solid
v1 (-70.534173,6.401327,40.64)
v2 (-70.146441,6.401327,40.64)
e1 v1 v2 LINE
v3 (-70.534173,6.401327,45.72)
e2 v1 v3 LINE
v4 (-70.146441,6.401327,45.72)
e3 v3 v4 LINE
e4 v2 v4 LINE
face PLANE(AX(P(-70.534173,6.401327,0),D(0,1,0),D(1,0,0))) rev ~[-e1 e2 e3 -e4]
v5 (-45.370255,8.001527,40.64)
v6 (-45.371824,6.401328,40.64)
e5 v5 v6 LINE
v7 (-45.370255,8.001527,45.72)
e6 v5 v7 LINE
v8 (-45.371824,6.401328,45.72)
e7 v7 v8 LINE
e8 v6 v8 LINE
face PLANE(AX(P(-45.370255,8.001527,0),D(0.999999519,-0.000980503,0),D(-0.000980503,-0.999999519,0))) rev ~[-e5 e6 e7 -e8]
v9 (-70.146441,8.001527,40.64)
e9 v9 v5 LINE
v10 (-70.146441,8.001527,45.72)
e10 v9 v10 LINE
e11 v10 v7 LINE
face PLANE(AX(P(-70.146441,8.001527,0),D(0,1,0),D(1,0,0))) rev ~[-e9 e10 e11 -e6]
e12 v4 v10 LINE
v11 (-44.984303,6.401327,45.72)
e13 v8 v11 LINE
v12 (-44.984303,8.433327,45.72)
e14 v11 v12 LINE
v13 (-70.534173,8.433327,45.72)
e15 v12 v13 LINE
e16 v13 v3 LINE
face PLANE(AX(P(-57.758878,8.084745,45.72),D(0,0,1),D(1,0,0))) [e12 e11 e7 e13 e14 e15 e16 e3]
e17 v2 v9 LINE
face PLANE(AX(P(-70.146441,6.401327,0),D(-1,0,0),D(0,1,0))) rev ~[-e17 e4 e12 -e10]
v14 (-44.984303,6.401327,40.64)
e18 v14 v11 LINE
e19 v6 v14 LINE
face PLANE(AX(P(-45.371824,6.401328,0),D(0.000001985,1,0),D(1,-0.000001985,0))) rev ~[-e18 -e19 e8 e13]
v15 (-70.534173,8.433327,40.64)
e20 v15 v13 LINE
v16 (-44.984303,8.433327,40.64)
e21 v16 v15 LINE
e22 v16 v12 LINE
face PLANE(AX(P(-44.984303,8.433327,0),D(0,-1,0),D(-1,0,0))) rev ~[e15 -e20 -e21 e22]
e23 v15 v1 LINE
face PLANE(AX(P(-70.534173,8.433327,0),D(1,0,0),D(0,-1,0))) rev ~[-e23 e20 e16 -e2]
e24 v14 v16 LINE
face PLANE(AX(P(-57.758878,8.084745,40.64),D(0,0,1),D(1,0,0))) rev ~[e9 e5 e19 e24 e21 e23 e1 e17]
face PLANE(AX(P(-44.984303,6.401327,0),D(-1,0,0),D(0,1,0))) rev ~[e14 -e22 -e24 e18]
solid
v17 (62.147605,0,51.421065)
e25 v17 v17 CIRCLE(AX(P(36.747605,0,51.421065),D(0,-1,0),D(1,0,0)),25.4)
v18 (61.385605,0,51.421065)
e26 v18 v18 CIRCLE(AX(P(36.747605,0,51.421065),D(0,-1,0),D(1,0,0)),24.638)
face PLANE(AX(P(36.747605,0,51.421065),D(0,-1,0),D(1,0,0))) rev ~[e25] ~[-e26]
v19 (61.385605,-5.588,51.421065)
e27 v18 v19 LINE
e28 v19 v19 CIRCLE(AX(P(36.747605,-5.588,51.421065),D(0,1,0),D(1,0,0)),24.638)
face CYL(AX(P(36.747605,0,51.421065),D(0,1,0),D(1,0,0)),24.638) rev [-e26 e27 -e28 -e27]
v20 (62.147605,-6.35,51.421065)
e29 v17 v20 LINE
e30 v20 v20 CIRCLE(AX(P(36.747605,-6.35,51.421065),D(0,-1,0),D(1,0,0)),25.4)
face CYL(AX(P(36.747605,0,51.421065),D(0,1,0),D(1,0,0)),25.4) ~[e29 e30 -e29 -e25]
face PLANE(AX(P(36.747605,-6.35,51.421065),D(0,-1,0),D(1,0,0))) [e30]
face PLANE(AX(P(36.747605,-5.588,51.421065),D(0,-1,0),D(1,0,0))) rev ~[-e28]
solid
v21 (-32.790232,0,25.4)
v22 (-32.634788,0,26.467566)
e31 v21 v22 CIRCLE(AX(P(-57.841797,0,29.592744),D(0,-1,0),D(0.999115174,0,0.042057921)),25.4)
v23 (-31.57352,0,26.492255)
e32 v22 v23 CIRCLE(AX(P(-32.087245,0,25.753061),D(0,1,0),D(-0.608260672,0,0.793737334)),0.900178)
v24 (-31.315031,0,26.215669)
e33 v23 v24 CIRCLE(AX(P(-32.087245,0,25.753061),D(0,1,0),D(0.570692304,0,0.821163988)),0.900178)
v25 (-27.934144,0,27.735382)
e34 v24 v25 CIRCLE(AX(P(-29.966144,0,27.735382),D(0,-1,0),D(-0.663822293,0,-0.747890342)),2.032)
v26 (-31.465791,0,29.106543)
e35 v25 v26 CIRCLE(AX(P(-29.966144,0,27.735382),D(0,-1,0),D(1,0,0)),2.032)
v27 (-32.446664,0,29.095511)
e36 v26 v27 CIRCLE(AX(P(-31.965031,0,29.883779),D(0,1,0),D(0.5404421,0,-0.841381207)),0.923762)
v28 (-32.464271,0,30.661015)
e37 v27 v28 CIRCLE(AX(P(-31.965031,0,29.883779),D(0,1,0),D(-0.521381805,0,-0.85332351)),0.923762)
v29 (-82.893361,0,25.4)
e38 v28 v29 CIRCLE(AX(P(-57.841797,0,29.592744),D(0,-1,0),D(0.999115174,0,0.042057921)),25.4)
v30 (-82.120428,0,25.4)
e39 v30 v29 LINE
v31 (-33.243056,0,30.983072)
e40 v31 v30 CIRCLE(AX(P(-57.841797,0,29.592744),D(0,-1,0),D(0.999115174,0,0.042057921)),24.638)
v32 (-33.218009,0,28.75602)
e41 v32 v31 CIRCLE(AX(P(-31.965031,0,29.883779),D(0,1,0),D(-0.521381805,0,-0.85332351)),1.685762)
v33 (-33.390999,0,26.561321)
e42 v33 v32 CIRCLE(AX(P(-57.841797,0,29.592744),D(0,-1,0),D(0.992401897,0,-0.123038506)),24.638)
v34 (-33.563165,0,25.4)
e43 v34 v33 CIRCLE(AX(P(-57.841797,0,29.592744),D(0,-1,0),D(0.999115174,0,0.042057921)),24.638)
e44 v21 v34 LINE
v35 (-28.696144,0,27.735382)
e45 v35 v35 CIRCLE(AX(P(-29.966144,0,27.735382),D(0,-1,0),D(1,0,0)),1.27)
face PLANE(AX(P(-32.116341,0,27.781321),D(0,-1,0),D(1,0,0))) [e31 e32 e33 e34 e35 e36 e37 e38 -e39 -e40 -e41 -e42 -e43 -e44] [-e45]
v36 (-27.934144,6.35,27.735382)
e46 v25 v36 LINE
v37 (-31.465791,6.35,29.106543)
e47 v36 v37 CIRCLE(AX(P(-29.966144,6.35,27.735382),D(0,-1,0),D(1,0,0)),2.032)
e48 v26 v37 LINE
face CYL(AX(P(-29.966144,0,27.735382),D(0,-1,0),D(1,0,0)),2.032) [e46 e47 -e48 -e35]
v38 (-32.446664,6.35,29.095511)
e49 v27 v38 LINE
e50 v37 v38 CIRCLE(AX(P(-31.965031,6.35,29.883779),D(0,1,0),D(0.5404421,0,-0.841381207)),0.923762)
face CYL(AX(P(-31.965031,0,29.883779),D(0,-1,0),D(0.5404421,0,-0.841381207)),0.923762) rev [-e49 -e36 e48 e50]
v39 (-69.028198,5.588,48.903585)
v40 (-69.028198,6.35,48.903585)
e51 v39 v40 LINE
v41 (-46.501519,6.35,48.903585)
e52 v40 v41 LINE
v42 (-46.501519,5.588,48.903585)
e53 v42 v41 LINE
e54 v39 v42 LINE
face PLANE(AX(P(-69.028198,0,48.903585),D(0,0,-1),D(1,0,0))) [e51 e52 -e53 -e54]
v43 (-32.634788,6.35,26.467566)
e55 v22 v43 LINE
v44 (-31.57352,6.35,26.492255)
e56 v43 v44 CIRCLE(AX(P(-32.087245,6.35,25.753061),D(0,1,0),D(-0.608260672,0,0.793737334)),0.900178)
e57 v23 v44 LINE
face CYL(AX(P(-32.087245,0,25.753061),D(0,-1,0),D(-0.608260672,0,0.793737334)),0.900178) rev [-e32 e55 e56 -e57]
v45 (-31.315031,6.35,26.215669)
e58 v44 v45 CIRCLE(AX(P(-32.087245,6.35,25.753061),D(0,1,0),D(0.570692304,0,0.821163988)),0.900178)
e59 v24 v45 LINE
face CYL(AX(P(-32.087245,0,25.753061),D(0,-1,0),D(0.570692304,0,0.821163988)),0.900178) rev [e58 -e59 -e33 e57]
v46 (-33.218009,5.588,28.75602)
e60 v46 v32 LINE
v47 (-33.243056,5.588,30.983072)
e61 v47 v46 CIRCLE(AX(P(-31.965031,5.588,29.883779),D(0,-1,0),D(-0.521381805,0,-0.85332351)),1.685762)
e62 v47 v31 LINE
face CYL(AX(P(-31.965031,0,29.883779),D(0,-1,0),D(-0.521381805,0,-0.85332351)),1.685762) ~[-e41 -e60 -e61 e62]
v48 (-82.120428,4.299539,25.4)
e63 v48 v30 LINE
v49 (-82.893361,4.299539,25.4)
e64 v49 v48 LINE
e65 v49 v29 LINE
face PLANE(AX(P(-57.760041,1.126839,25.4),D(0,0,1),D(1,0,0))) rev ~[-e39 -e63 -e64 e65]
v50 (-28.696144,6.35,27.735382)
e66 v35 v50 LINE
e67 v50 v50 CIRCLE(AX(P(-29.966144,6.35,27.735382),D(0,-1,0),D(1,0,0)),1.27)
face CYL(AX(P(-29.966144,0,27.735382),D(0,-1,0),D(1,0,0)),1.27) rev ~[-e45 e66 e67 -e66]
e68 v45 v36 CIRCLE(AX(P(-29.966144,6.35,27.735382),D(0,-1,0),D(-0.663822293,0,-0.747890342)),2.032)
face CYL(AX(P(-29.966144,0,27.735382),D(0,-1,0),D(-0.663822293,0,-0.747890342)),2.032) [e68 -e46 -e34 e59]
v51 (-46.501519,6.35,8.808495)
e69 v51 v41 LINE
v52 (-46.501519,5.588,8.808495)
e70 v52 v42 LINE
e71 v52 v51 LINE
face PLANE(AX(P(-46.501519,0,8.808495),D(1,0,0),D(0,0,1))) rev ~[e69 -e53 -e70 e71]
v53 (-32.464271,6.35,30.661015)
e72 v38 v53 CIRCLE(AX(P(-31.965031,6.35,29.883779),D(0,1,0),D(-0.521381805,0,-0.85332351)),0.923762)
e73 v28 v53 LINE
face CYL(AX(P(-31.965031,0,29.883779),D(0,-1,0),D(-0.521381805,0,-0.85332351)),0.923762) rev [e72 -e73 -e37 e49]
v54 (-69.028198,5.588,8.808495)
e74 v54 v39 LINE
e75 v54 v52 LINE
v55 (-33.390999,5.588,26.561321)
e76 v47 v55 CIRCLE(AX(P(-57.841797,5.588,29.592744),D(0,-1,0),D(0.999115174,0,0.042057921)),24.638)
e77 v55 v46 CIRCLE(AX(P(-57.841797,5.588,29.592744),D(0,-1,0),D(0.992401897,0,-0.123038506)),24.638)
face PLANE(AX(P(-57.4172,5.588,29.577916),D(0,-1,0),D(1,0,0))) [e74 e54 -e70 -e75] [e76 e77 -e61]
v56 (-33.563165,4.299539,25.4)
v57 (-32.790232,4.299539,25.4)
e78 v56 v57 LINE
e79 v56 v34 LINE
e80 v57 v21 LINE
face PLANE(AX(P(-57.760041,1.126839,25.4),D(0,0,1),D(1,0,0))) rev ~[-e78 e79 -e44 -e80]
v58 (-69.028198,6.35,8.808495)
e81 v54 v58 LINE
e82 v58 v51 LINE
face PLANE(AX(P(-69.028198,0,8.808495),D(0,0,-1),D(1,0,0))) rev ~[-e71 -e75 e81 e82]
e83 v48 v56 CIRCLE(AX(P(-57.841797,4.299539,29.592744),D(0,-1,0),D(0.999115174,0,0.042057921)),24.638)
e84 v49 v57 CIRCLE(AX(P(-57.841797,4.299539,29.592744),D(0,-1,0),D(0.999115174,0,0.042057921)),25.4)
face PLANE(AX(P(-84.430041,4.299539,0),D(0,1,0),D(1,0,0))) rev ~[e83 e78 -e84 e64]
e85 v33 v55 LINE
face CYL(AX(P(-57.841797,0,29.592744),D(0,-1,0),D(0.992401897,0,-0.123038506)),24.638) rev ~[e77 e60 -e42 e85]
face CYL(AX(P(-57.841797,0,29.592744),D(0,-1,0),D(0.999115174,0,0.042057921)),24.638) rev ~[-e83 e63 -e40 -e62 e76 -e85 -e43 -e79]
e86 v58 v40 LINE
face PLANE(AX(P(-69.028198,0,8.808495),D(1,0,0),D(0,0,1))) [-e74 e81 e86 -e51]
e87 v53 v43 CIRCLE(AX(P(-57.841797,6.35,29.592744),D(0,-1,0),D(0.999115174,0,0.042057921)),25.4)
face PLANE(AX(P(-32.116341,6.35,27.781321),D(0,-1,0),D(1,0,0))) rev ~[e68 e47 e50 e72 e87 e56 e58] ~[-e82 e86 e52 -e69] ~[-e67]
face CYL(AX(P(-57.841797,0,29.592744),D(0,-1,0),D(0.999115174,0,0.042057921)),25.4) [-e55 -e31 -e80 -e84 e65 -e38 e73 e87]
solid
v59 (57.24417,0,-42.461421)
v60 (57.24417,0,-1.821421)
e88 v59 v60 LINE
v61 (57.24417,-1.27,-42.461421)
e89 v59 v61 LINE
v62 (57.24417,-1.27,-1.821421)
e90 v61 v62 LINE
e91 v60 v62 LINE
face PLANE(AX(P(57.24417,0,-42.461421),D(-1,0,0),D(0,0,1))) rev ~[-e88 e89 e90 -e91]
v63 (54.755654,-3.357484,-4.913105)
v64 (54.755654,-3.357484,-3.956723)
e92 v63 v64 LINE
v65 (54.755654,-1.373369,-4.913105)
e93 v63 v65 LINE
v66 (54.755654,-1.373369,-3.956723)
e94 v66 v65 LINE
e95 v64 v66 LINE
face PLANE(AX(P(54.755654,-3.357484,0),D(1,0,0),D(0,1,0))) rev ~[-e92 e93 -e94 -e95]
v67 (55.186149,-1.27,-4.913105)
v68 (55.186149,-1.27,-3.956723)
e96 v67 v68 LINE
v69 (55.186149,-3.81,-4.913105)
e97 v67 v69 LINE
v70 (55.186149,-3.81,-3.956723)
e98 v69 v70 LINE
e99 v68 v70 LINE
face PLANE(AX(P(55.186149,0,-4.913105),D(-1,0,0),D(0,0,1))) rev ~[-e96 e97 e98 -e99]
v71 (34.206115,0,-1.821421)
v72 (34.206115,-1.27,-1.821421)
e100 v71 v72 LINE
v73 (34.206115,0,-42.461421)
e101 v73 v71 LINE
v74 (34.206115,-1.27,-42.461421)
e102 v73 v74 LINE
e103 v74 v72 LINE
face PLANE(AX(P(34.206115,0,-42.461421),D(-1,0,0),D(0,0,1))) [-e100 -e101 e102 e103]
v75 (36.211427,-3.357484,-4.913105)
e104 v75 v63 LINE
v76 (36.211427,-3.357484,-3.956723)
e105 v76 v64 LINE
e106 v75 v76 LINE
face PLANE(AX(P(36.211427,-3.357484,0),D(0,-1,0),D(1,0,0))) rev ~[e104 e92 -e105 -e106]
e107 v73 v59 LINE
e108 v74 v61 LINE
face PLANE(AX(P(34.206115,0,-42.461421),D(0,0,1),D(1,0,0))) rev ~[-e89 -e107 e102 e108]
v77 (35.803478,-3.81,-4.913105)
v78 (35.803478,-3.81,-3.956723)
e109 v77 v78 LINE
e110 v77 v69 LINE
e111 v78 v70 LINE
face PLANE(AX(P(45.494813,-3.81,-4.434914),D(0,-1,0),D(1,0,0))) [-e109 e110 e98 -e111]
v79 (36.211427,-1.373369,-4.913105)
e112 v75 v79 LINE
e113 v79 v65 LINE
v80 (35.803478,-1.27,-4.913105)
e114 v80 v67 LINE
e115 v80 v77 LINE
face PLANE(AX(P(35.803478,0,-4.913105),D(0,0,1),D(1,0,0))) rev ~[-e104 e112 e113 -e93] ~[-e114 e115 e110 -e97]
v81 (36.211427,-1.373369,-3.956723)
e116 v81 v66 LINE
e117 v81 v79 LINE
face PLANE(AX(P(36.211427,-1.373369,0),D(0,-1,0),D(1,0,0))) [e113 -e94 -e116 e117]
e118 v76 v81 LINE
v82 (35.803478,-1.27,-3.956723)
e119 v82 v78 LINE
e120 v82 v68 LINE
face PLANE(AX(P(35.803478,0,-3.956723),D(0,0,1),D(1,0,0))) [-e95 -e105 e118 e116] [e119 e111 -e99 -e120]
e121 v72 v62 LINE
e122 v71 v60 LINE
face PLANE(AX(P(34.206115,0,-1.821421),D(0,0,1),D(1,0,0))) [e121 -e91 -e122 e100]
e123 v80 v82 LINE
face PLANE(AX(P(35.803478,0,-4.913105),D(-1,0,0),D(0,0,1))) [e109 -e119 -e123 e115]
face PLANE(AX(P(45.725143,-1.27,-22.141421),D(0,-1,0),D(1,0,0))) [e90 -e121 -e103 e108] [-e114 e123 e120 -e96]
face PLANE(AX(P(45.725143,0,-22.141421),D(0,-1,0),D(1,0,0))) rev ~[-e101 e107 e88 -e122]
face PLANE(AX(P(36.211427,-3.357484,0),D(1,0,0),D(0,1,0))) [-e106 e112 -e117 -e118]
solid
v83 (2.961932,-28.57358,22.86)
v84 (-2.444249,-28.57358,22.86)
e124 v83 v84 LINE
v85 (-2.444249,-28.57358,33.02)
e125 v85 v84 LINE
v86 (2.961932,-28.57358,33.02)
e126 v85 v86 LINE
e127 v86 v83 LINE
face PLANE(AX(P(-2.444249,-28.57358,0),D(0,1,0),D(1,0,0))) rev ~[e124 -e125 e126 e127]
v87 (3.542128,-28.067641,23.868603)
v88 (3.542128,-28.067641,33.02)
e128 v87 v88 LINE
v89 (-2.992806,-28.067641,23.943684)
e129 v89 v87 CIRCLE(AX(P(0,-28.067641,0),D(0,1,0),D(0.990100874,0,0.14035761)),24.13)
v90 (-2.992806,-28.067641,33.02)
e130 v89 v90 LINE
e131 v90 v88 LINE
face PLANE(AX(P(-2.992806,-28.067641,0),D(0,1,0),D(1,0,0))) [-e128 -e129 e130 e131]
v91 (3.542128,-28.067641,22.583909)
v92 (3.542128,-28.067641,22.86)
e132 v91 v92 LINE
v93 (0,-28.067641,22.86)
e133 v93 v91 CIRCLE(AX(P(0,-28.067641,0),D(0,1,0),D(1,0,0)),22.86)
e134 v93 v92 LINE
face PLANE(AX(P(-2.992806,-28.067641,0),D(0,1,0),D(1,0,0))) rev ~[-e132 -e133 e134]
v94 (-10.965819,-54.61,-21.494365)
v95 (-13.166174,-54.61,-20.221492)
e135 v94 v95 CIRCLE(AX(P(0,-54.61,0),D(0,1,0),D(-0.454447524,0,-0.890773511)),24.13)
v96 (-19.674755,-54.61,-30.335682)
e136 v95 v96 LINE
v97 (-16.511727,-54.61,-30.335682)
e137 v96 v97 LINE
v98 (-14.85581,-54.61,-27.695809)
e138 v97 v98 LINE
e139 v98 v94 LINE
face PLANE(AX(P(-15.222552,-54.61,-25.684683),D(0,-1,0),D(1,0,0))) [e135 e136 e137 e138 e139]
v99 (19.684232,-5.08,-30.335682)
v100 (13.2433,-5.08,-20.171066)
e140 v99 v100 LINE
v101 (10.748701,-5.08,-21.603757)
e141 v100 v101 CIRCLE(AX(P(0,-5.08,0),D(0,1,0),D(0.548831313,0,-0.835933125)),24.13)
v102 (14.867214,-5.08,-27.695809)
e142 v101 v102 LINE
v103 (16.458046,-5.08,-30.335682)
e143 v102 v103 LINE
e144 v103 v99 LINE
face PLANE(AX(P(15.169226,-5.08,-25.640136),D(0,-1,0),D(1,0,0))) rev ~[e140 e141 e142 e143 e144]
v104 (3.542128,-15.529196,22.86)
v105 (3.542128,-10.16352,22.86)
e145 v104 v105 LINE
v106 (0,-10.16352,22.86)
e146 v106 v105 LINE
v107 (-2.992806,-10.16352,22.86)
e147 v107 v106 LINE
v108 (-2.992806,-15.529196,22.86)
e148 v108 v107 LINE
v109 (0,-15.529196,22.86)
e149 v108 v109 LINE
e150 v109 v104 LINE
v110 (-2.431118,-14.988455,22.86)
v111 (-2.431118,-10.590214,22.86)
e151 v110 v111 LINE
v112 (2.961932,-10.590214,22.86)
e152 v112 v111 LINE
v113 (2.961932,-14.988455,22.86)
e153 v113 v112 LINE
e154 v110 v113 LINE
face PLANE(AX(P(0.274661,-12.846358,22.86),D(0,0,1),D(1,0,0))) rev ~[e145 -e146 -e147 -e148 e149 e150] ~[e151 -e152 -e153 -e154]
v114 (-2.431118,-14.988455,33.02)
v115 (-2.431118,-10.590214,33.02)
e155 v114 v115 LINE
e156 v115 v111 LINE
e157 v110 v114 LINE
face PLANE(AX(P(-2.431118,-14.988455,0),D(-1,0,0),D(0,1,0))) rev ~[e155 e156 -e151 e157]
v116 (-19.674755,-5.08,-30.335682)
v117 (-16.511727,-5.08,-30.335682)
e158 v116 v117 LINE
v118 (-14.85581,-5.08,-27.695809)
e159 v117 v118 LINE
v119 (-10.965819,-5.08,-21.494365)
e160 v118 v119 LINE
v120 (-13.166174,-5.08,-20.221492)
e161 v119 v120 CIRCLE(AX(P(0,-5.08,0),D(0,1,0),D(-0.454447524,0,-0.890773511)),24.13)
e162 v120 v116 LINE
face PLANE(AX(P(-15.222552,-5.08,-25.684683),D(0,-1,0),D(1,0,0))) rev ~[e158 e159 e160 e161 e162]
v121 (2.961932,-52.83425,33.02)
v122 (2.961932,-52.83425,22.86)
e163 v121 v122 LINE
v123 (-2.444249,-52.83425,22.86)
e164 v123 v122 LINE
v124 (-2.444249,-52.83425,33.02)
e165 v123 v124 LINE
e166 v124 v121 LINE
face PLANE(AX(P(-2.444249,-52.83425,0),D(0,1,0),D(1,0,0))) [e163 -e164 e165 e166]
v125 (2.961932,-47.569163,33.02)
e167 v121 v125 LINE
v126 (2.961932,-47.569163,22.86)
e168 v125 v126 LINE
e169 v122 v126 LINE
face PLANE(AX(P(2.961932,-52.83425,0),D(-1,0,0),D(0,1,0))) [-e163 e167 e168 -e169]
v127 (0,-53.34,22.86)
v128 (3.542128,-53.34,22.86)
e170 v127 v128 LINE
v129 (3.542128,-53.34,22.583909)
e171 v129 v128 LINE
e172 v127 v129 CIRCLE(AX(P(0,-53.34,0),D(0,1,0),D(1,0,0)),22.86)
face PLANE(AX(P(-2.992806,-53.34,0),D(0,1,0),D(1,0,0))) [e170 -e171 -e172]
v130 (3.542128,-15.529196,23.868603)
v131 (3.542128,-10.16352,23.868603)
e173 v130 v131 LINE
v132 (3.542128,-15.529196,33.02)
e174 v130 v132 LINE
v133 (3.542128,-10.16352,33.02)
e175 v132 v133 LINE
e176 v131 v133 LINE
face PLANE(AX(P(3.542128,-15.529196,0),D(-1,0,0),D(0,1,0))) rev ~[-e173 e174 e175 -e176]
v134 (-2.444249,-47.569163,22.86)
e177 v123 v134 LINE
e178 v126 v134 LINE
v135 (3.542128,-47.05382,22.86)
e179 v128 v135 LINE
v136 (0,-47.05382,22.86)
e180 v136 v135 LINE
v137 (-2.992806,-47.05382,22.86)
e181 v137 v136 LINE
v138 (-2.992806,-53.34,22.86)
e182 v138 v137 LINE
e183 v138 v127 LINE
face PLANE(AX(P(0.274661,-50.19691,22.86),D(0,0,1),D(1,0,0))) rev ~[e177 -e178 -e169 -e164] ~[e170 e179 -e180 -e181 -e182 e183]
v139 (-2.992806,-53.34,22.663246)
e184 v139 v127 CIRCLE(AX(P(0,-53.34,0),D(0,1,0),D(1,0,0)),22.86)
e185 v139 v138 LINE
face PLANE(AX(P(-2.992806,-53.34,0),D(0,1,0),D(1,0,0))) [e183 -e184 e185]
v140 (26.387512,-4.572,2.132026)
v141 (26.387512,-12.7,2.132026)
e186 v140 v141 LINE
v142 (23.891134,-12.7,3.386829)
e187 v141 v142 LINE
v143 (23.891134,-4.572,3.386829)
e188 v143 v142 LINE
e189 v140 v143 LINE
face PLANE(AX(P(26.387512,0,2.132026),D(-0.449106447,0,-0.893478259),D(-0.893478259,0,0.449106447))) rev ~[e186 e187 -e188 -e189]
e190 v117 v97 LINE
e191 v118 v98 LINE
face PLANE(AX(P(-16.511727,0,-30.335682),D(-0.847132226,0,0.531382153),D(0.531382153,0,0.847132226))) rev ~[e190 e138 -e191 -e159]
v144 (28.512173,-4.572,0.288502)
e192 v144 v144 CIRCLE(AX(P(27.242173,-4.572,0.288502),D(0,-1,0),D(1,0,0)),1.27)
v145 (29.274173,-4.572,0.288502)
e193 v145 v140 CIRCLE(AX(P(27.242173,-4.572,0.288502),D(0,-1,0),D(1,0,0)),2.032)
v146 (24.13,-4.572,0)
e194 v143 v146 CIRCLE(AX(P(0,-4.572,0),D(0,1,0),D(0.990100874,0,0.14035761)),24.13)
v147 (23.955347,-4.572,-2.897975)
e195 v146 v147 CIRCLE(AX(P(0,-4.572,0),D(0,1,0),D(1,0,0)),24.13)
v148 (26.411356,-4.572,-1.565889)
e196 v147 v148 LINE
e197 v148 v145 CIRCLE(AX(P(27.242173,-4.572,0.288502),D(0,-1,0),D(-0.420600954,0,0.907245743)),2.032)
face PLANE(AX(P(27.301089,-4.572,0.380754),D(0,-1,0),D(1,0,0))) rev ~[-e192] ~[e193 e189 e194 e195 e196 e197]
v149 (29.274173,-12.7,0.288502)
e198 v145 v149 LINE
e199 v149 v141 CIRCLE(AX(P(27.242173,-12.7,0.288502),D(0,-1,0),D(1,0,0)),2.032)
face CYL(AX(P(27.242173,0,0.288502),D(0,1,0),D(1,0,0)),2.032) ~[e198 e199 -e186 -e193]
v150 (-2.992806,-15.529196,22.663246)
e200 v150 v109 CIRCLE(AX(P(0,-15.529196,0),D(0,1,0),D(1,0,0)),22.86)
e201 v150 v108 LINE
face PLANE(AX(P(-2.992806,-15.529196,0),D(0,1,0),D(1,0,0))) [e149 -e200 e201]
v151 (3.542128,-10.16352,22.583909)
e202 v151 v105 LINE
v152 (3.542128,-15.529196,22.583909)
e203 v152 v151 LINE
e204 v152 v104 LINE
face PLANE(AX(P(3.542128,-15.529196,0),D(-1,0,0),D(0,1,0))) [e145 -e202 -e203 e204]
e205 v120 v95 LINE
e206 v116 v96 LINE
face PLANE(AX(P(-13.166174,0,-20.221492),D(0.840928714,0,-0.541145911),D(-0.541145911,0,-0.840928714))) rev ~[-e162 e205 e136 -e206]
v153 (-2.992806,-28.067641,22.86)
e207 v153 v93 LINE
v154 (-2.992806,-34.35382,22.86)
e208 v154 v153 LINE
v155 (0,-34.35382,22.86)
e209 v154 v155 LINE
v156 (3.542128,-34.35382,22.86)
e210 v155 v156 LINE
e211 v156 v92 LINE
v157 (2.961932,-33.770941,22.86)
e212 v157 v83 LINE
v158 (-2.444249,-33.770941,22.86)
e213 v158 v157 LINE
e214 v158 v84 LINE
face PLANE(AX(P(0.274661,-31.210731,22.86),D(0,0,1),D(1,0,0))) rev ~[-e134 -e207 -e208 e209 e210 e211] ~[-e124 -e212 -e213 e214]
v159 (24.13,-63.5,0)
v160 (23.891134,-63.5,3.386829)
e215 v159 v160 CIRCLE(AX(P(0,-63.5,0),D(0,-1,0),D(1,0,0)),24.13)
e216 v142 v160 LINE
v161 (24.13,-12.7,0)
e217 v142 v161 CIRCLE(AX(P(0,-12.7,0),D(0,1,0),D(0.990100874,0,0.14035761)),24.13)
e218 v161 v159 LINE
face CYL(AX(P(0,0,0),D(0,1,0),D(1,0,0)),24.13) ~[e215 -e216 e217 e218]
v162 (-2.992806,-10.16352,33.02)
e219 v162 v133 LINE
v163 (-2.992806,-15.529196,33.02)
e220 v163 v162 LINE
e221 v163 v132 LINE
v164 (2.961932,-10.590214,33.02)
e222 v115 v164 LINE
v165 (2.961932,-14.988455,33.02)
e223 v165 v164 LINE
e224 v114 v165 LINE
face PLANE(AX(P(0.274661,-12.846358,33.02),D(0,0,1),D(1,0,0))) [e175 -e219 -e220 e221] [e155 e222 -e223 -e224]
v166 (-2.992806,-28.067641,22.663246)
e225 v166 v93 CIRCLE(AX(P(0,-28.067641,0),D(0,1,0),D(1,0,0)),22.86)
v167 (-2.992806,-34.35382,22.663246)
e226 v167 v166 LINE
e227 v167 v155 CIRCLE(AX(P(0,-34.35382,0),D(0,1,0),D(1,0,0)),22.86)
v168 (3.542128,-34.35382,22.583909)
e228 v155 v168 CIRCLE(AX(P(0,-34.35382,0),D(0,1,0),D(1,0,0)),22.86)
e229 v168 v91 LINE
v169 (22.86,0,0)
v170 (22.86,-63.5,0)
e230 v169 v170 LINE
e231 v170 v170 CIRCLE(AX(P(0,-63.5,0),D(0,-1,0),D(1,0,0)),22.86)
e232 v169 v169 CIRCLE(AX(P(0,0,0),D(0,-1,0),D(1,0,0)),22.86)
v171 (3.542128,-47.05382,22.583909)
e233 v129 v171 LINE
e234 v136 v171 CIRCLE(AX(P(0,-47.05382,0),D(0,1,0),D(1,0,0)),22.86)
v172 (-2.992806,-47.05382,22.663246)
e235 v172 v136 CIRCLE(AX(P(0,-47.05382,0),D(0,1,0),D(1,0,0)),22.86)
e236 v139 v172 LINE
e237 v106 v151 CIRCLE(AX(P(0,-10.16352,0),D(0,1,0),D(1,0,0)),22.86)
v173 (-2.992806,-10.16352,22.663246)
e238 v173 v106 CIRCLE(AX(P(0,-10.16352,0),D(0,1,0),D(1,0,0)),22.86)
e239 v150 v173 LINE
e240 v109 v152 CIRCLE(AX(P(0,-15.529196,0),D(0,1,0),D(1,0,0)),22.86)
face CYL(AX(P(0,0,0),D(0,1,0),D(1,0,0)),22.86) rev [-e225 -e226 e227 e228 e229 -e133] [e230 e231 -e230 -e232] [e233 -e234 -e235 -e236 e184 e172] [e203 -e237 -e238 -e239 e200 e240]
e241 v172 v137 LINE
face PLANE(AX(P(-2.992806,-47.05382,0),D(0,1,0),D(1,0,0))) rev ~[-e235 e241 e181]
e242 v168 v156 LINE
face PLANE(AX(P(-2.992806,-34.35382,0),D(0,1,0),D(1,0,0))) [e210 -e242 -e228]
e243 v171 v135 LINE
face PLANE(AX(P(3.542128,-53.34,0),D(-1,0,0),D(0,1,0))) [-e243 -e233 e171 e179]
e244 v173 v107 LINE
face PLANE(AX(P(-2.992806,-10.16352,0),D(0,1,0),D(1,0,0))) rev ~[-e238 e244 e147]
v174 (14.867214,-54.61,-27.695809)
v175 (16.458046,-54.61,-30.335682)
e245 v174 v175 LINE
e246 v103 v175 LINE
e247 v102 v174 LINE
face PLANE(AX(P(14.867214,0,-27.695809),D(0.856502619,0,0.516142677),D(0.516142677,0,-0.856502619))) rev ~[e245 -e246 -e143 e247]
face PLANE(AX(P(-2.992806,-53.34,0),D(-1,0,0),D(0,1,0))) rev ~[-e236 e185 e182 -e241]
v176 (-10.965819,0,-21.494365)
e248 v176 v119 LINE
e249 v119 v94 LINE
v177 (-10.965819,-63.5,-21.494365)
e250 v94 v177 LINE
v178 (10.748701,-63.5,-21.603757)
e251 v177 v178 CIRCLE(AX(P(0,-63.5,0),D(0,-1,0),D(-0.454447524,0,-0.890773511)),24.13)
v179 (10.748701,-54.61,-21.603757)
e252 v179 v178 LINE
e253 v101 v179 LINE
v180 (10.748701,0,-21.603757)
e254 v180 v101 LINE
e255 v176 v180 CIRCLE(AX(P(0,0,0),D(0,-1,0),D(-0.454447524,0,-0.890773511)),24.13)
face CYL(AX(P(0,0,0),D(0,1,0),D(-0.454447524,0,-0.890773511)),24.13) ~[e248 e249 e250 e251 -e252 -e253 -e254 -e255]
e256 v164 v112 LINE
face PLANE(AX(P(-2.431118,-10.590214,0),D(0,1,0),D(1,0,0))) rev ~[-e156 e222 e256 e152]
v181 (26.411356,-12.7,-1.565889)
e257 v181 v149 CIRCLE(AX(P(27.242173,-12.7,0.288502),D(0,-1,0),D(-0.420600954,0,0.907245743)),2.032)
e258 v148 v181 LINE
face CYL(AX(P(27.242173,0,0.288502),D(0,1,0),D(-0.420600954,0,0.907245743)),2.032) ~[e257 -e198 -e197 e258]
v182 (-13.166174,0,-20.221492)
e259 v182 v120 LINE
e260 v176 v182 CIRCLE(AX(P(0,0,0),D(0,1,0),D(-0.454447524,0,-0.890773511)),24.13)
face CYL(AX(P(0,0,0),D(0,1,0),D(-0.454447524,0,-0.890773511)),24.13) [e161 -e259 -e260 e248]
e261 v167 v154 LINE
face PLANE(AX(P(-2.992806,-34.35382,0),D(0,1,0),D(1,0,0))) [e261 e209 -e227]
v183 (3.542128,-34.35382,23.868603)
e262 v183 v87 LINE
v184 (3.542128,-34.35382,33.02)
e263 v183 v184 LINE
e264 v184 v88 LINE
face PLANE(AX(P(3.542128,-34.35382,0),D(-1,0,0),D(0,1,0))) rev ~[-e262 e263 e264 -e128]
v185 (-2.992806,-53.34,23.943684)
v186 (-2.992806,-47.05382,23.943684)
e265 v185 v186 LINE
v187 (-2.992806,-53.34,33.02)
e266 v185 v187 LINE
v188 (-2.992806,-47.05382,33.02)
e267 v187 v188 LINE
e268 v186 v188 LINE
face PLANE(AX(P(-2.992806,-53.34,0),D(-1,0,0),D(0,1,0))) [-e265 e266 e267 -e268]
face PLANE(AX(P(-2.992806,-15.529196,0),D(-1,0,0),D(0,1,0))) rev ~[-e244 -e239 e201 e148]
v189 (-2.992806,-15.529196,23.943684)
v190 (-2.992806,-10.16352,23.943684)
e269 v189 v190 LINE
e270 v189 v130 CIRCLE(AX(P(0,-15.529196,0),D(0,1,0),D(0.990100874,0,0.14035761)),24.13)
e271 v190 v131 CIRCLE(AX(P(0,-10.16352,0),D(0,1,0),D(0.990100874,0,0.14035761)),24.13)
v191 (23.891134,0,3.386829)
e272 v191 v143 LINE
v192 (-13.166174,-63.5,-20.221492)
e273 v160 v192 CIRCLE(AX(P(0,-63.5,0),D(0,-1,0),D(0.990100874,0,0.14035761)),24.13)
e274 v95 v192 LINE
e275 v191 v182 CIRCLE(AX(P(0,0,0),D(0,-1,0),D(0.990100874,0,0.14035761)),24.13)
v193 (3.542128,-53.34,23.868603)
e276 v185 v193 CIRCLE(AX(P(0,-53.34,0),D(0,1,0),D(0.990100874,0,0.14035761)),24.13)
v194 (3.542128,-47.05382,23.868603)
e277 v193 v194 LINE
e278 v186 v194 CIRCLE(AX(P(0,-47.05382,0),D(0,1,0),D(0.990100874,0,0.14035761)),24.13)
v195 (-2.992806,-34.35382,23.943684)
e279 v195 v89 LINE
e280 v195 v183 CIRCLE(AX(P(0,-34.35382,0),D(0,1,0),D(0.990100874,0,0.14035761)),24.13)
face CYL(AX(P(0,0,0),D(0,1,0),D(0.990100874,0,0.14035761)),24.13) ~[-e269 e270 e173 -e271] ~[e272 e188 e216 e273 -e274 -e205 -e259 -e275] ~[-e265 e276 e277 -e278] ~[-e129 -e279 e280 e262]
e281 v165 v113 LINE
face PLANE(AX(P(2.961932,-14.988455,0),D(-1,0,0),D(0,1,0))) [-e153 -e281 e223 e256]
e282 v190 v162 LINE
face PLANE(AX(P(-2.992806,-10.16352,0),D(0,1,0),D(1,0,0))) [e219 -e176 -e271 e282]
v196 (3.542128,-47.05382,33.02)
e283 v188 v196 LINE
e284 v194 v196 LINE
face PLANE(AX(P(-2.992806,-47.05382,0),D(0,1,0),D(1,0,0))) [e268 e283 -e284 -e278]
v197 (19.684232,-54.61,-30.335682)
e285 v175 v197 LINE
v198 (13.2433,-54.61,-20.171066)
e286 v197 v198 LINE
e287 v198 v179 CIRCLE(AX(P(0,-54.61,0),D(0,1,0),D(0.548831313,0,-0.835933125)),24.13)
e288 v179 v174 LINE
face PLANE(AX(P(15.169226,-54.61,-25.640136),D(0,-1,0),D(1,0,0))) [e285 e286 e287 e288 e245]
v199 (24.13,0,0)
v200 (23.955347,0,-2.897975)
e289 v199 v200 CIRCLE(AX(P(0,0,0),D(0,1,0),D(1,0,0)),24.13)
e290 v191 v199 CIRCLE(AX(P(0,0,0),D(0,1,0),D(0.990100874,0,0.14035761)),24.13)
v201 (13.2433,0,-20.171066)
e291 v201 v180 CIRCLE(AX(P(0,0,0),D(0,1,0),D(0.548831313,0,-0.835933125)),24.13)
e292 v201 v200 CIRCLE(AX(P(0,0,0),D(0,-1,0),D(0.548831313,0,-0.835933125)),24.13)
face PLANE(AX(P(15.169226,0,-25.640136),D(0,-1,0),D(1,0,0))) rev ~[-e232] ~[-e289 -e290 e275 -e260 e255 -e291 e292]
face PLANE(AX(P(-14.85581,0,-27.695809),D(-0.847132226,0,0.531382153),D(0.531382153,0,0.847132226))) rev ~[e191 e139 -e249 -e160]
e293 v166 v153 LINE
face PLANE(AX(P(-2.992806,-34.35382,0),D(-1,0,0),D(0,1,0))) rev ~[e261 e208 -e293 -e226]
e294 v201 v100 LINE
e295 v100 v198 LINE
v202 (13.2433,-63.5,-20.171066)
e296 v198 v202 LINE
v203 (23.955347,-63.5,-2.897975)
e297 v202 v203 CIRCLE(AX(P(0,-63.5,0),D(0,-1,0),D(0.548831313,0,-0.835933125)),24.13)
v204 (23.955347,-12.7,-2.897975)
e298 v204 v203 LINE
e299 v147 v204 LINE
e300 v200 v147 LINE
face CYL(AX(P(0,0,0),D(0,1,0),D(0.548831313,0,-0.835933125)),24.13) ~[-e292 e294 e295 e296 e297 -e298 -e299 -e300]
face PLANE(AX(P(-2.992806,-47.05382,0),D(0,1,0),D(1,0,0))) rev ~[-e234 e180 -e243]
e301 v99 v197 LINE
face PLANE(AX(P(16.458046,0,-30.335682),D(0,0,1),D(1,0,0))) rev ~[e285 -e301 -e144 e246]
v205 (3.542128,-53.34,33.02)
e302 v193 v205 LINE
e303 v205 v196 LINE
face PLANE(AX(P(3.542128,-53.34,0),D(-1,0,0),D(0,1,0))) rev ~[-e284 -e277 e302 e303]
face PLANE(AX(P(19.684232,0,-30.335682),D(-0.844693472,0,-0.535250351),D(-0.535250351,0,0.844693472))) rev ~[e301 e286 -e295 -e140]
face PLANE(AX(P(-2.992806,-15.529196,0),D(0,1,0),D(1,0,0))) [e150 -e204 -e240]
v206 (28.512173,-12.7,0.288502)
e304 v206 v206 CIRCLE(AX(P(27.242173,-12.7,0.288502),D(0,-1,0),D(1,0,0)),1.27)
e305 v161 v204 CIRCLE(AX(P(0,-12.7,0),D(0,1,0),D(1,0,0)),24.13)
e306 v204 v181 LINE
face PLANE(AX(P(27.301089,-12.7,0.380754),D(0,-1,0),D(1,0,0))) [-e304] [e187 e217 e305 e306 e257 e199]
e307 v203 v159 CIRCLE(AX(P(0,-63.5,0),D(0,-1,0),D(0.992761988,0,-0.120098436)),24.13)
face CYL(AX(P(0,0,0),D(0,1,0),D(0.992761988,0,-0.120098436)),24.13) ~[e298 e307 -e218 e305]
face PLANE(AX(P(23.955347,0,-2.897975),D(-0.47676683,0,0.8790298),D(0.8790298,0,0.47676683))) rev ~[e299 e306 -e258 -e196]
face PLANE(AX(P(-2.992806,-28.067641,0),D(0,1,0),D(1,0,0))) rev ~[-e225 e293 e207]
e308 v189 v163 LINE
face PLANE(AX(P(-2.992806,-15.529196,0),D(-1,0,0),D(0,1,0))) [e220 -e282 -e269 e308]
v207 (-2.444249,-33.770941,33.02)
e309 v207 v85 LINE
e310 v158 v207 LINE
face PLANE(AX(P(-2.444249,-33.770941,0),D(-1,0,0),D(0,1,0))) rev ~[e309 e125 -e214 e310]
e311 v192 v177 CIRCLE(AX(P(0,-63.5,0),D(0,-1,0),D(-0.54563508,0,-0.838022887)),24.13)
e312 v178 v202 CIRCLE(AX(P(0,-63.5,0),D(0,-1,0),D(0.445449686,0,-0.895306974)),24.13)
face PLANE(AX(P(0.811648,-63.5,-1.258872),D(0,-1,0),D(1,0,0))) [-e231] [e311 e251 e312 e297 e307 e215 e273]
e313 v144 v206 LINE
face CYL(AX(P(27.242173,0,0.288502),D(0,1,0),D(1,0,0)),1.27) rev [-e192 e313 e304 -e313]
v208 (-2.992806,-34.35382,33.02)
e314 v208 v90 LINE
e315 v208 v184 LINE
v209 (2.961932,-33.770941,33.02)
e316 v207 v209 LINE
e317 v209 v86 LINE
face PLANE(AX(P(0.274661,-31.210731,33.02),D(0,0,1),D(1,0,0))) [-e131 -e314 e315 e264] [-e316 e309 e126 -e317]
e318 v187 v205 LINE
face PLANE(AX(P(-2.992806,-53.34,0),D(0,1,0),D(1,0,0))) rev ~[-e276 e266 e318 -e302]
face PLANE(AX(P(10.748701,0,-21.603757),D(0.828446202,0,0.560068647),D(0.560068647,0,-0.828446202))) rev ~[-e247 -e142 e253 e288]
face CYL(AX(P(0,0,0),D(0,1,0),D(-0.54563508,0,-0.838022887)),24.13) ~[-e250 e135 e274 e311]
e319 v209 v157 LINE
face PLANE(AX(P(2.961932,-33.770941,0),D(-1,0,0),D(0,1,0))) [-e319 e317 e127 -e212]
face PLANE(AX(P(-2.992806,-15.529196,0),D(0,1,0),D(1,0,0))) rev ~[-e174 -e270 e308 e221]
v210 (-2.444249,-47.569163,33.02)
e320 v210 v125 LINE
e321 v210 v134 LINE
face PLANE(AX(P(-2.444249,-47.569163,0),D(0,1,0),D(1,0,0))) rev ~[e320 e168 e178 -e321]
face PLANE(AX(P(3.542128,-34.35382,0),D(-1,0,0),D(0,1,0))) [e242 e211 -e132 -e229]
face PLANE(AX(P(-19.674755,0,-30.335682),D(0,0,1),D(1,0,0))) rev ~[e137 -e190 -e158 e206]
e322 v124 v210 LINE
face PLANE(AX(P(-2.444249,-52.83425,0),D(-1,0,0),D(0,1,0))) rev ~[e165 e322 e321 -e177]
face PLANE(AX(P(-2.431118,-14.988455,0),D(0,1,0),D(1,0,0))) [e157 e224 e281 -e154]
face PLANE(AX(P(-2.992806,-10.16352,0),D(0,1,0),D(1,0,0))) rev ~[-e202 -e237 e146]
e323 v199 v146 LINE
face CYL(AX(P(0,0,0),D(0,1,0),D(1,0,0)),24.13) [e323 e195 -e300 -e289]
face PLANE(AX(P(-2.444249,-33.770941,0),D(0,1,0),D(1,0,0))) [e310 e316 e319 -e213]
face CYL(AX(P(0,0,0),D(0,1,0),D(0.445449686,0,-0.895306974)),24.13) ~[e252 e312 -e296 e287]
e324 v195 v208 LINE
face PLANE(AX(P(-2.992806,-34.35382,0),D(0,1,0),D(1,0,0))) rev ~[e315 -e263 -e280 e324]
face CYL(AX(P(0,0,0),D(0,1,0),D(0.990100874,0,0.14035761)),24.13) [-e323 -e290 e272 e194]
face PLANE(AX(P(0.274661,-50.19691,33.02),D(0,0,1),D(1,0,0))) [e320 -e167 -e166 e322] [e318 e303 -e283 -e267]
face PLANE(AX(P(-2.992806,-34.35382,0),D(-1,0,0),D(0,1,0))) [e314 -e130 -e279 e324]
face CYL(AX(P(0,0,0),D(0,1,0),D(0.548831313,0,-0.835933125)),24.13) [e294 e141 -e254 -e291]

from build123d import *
from build123d import SkipClean  # not in build123d's __all__

# Parameters (mm, degrees)
F3_DEPTH  = 6.35
F0_R      = 25.4
F4_DEPTH  = 6.35
F0_R_2    = 22.86
F5_DEPTH  = 63.5
F0_R_3    = 1.27
F6_DEPTH  = 12.7
F7_T      = -0.762
F1_W      = 53.34
F1_H      = 6.3453992899
F8_DEPTH  = 25.4
F9_DEPTH  = 6.35
F10_T     = -0.762
F2_W      = 22.526679039
F2_H      = 40.0950905681
F11_DEPTH = 12.7
F12_DEPTH = 4.572
F13_DEPTH = 45.72
F14_DEPTH = 40.64
F2_W_2    = 23.0380557477
F2_H_2    = 40.64
F2_W_3    = 19.3826705217
F2_H_3    = 0.9563816711
F15_DEPTH = 1.27
F16_W     = 6.5349340439
F16_H     = 5.3656761461
F16_W_2   = 5.3930499125
F16_H_2   = 4.3982407078
F16_H_3   = 6.2861796468
F16_W_3   = 5.4061815608
F16_H_4   = 5.1973611116
F16_H_5   = 5.2650868893
F17_DEPTH = 33.02
F18_DEPTH = 22.86
F19_DEPTH = 76.8220646396
F20_DEPTH = 3.81
F21_W     = 18.5442268848
F21_H     = 1.9841159228
F22_DEPTH = 6.35
F23_DEPTH = 54.61
F24_DEPTH = 5.08


# Not quite as in the source:
# - after a boolean that leaves OpenCascade's solid faulty, fix() repairs it
# - a feature names something its author has since deleted; it is built from what else it names


with BuildPart() as f3:
    # F0 (on Front) → F3 (new body)
    with BuildSketch(Plane.XZ):
        with BuildLine():
            ThreePointArc((-32.4466640218, 29.0955113473), (-32.8887348811, 29.8733902735), (-32.4642711977, 30.661015089))
            ThreePointArc((-32.4642711977, 30.661015089), (-83.2208236821, 30.6247252425), (-32.6347884268, 26.467565851))
            ThreePointArc((-32.6347884268, 26.467565851), (-32.5066296075, 27.7790977549), (-32.4466640218, 29.0955113473))
        make_face()
    extrude(amount=-F3_DEPTH)

    # F7
    f7_openings = [f3.faces().sort_by_distance(p)[0] for p in [
        (-57.847912, 0, 29.592675),
    ]]
    offset(amount=F7_T, openings=f7_openings)

    # F1 (on Top) → F8 (cut)
    with BuildSketch(Plane.XY):
        with Locations((-57.7600412071, 1.1268389062)):
            Rectangle(F1_W, F1_H)
    extrude(amount=F8_DEPTH, mode=Mode.SUBTRACT)

    # F0 (on Front) → F9 (join)
    with BuildSketch(Plane.XZ):
        with BuildLine():
            ThreePointArc((-31.4657914959, 29.1065431926), (-31.9546424795, 28.9600756065), (-32.4466640218, 29.0955113473))
            ThreePointArc((-32.4466640218, 29.0955113473), (-32.5066296075, 27.7790977549), (-32.6347884268, 26.467565851))
            ThreePointArc((-32.6347884268, 26.467565851), (-32.1081809699, 26.6529955741), (-31.5735203503, 26.492254734))
            ThreePointArc((-31.5735203503, 26.492254734), (-31.9964212199, 27.8190453719), (-31.4657914959, 29.1065431926))
        make_face()
        with BuildLine():
            ThreePointArc((-27.9341442708, 27.7353822975), (-29.2307053411, 29.6296245156), (-31.4657914959, 29.1065431926))
            ThreePointArc((-31.4657914959, 29.1065431926), (-31.9964212199, 27.8190453719), (-31.5735203503, 26.492254734))
            ThreePointArc((-31.5735203503, 26.492254734), (-31.4295715741, 26.3677040501), (-31.3150311705, 26.2156691233))
            ThreePointArc((-31.3150311705, 26.2156691233), (-29.133051893, 25.8820120997), (-27.9341442708, 27.7353822975))
        make_face()
        with Locations((-29.9661442708, 27.7353822975)):
            Circle(F0_R_3, mode=Mode.SUBTRACT)
    extrude(amount=-F9_DEPTH)

    # F2 (on Front) → F11 (cut)
    with BuildSketch(Plane.XZ):
        with Locations((-57.7648580501, 28.8560400026)):
            Rectangle(F2_W, F2_H)
    extrude(amount=-F11_DEPTH, mode=Mode.SUBTRACT)


with BuildPart() as f4:
    # F0 (on Front) → F4 (new body)
    with BuildSketch(Plane.XZ):
        with Locations((36.7476053159, 51.4210646396)):
            Circle(F0_R)
    extrude(amount=F4_DEPTH)

    # F10
    f10_openings = [f4.faces().sort_by_distance(p)[0] for p in [
        (36.747605, 0, 51.421065),
    ]]
    offset(amount=F10_T, openings=f10_openings)


with BuildPart() as f5:
    # F0 (on Front) → F5 (new body)
    with BuildSketch(Plane.XZ):
        with BuildLine():
            ThreePointArc((23.9553467799, -2.897975268), (24.0862971189, -1.4516167195), (24.13, 0))
            ThreePointArc((24.13, 0), (24.0702094486, 1.6976210124), (23.8911340985, 3.38682912))
            ThreePointArc((23.8911340985, 3.38682912), (-12.9651224252, 20.3509827896), (-13.1661744724, -20.2214922734))
            ThreePointArc((-13.1661744724, -20.2214922734), (-12.0827697744, -20.8869235308), (-10.9658187558, -21.49436482))
            ThreePointArc((-10.9658187558, -21.49436482), (-0.1215595159, -24.1296938083), (10.7487009216, -21.6037572773))
            ThreePointArc((10.7487009216, -21.6037572773), (12.0173696309, -20.9246201197), (13.2432995784, -20.1710663148))
            ThreePointArc((13.2432995784, -20.1710663148), (20.5066999125, -12.7173959087), (23.9553467799, -2.897975268))
        make_face()
        Circle(F0_R_2, mode=Mode.SUBTRACT)
    extrude(amount=F5_DEPTH)

    # F0 (on Front) → F6 (join)
    with BuildSketch(Plane.XZ):
        with BuildLine():
            ThreePointArc((29.2741734921, 0.2885023588), (28.3358719352, 2.0010582602), (26.3875123546, 2.1320257082))
            ThreePointArc((26.3875123546, 2.1320257082), (25.2102157311, 0.2754005508), (26.4113560417, -1.5658887446))
            ThreePointArc((26.4113560417, -1.5658887446), (28.346891316, -1.4169660607), (29.2741734921, 0.2885023588))
        make_face()
        with Locations((27.2421734921, 0.2885023588)):
            Circle(F0_R_3, mode=Mode.SUBTRACT)
        with BuildLine():
            ThreePointArc((23.8911340985, 3.38682912), (24.0702094486, 1.6976210124), (24.13, 0))
            ThreePointArc((24.13, 0), (24.0862971189, -1.4516167195), (23.9553467799, -2.897975268))
            Line((23.9553467799, -2.897975268), (26.4113560417, -1.5658887446))
            ThreePointArc((26.4113560417, -1.5658887446), (25.2102157311, 0.2754005508), (26.3875123546, 2.1320257082))
            Line((26.3875123546, 2.1320257082), (23.8911340985, 3.38682912))
        make_face()
    extrude(amount=F6_DEPTH)

    # F0 (on Front) → F12 (cut)
    with BuildSketch(Plane.XZ):
        with BuildLine():
            ThreePointArc((29.2741734921, 0.2885023588), (28.3358719352, 2.0010582602), (26.3875123546, 2.1320257082))
            ThreePointArc((26.3875123546, 2.1320257082), (25.2102157311, 0.2754005508), (26.4113560417, -1.5658887446))
            ThreePointArc((26.4113560417, -1.5658887446), (28.346891316, -1.4169660607), (29.2741734921, 0.2885023588))
        make_face()
        with Locations((27.2421734921, 0.2885023588)):
            Circle(F0_R_3, mode=Mode.SUBTRACT)
        with BuildLine():
            ThreePointArc((23.8911340985, 3.38682912), (24.0702094486, 1.6976210124), (24.13, 0))
            ThreePointArc((24.13, 0), (24.0862971189, -1.4516167195), (23.9553467799, -2.897975268))
            Line((23.9553467799, -2.897975268), (26.4113560417, -1.5658887446))
            ThreePointArc((26.4113560417, -1.5658887446), (25.2102157311, 0.2754005508), (26.3875123546, 2.1320257082))
            Line((26.3875123546, 2.1320257082), (23.8911340985, 3.38682912))
        make_face()
    with SkipClean():  # cleaning this boolean's faces spoils the solid; the shape is the same uncleaned
        extrude(amount=F12_DEPTH, mode=Mode.SUBTRACT)

    # F16 (on Top) → F17 (join)
    with BuildSketch(Plane.XY):
        with Locations((0.2746605314, -12.8463576046)):
            Rectangle(F16_W, F16_H)
        with Locations((0.2654072596, -12.7893346362)):
            Rectangle(F16_W_2, F16_H_2, mode=Mode.SUBTRACT)
        with Locations((0.2746605314, -31.2107305297)):
            Rectangle(F16_W, F16_H_3)
        with Locations((0.2588414354, -31.1722606421)):
            Rectangle(F16_W_3, F16_H_4, mode=Mode.SUBTRACT)
        with Locations((0.2746605314, -50.1969101766)):
            Rectangle(F16_W, F16_H_3)
        with Locations((0.2588414354, -50.2017065883)):
            Rectangle(F16_W_3, F16_H_5, mode=Mode.SUBTRACT)
    extrude(amount=F17_DEPTH)

    add(f5.part.fix(), mode=Mode.REPLACE)

    # F16 (on Top) → F18 (cut)
    with BuildSketch(Plane.XY):
        with Locations((0.2746605314, -31.2107305297)):
            Rectangle(F16_W, F16_H_3)
        with Locations((0.2588414354, -31.1722606421)):
            Rectangle(F16_W_3, F16_H_4, mode=Mode.SUBTRACT)
        with Locations((0.2746605314, -12.8463576046)):
            Rectangle(F16_W, F16_H)
        with Locations((0.2654072596, -12.7893346362)):
            Rectangle(F16_W_2, F16_H_2, mode=Mode.SUBTRACT)
        with Locations((0.2746605314, -50.1969101766)):
            Rectangle(F16_W, F16_H_3)
        with Locations((0.2588414354, -50.2017065883)):
            Rectangle(F16_W_3, F16_H_5, mode=Mode.SUBTRACT)
    extrude(amount=F18_DEPTH, mode=Mode.SUBTRACT)

    # F16 (on Top) → F19 (cut, through all)
    with BuildSketch(Plane.XY):
        with Locations((0.2654072596, -12.7893346362)):
            Rectangle(F16_W_2, F16_H_2)
        with Locations((0.2588414354, -31.1722606421)):
            Rectangle(F16_W_3, F16_H_4)
        with Locations((0.2588414354, -50.2017065883)):
            Rectangle(F16_W_3, F16_H_5)
    extrude(amount=F19_DEPTH, mode=Mode.SUBTRACT)

    # F0 (on Front) → F23 (join)
    with BuildSketch(Plane.XZ):
        with BuildLine():
            Line((19.6842323282, -30.335681513), (13.2432995784, -20.1710663148))
            ThreePointArc((13.2432995784, -20.1710663148), (12.0173696309, -20.9246201197), (10.7487009216, -21.6037572773))
            Line((10.7487009216, -21.6037572773), (14.867214486, -27.6958085597))
            Line((14.867214486, -27.6958085597), (16.4580456913, -30.335681513))
            Line((16.4580456913, -30.335681513), (19.6842323282, -30.335681513))
        make_face()
        with BuildLine():
            ThreePointArc((-10.9658187558, -21.49436482), (-12.0827697744, -20.8869235308), (-13.1661744724, -20.2214922734))
            Line((-13.1661744724, -20.2214922734), (-19.6747548778, -30.335681513))
            Line((-19.6747548778, -30.335681513), (-16.5117273591, -30.335681513))
            Line((-16.5117273591, -30.335681513), (-14.8558095098, -27.6958085597))
            Line((-14.8558095098, -27.6958085597), (-10.9658187558, -21.49436482))
        make_face()
    extrude(amount=F23_DEPTH)

    # F0 (on Front) → F24 (cut)
    with BuildSketch(Plane.XZ):
        with BuildLine():
            Line((19.6842323282, -30.335681513), (13.2432995784, -20.1710663148))
            ThreePointArc((13.2432995784, -20.1710663148), (12.0173696309, -20.9246201197), (10.7487009216, -21.6037572773))
            Line((10.7487009216, -21.6037572773), (14.867214486, -27.6958085597))
            Line((14.867214486, -27.6958085597), (16.4580456913, -30.335681513))
            Line((16.4580456913, -30.335681513), (19.6842323282, -30.335681513))
        make_face()
        with BuildLine():
            ThreePointArc((-10.9658187558, -21.49436482), (-12.0827697744, -20.8869235308), (-13.1661744724, -20.2214922734))
            Line((-13.1661744724, -20.2214922734), (-19.6747548778, -30.335681513))
            Line((-19.6747548778, -30.335681513), (-16.5117273591, -30.335681513))
            Line((-16.5117273591, -30.335681513), (-14.8558095098, -27.6958085597))
            Line((-14.8558095098, -27.6958085597), (-10.9658187558, -21.49436482))
        make_face()
    with SkipClean():  # cleaning this boolean's faces spoils the solid; the shape is the same uncleaned
        extrude(amount=F24_DEPTH, mode=Mode.SUBTRACT)


with BuildPart() as f13:
    # F1 (on Top) → F13 (new body)
    with BuildSketch(Plane.XY):
        Polygon((-45.3702554693, 8.4333274387), (-70.1464414597, 8.4333274387), (-70.5341733992, 8.4333274387), (-70.5341733992, 6.4013274387), (-70.1464414597, 6.4013274387), (-70.1464414597, 8.0015274387), (-45.3702554693, 8.0015274387), (-45.371824471, 6.4013282079), (-44.9843034148, 6.4013274387), (-44.9843034148, 8.4333274387), align=None)
    extrude(amount=F13_DEPTH)

    # F1 (on Top) → F14 (cut)
    with BuildSketch(Plane.XY):
        Polygon((-45.3702554693, 8.4333274387), (-70.1464414597, 8.4333274387), (-70.5341733992, 8.4333274387), (-70.5341733992, 6.4013274387), (-70.1464414597, 6.4013274387), (-70.1464414597, 8.0015274387), (-45.3702554693, 8.0015274387), (-45.371824471, 6.4013282079), (-44.9843034148, 6.4013274387), (-44.9843034148, 8.4333274387), align=None)
    extrude(amount=F14_DEPTH, mode=Mode.SUBTRACT)


with BuildPart() as f15:
    # F2 (on Front) → F15 (new body)
    with BuildSketch(Plane.XZ):
        with Locations((45.7251425833, -22.1414213407)):
            Rectangle(F2_W_2, F2_H_2)
        with Locations((45.494813472, -4.4349143282)):
            Rectangle(F2_W_3, F2_H_3, mode=Mode.SUBTRACT)
    extrude(amount=F15_DEPTH)

    # F2 (on Front) → F20 (join)
    with BuildSketch(Plane.XZ):
        with Locations((45.494813472, -4.4349143282)):
            Rectangle(F2_W_3, F2_H_3)
    extrude(amount=F20_DEPTH)

    # F21 (on Top) → F22 (cut, symmetric)
    with BuildSketch(Plane.XY):
        with Locations((45.4835407436, -2.3654265096)):
            Rectangle(F21_W, F21_H)
    extrude(amount=F22_DEPTH, both=True, mode=Mode.SUBTRACT)


solid = Compound([f3.part, f4.part, f5.part, f13.part, f15.part])
